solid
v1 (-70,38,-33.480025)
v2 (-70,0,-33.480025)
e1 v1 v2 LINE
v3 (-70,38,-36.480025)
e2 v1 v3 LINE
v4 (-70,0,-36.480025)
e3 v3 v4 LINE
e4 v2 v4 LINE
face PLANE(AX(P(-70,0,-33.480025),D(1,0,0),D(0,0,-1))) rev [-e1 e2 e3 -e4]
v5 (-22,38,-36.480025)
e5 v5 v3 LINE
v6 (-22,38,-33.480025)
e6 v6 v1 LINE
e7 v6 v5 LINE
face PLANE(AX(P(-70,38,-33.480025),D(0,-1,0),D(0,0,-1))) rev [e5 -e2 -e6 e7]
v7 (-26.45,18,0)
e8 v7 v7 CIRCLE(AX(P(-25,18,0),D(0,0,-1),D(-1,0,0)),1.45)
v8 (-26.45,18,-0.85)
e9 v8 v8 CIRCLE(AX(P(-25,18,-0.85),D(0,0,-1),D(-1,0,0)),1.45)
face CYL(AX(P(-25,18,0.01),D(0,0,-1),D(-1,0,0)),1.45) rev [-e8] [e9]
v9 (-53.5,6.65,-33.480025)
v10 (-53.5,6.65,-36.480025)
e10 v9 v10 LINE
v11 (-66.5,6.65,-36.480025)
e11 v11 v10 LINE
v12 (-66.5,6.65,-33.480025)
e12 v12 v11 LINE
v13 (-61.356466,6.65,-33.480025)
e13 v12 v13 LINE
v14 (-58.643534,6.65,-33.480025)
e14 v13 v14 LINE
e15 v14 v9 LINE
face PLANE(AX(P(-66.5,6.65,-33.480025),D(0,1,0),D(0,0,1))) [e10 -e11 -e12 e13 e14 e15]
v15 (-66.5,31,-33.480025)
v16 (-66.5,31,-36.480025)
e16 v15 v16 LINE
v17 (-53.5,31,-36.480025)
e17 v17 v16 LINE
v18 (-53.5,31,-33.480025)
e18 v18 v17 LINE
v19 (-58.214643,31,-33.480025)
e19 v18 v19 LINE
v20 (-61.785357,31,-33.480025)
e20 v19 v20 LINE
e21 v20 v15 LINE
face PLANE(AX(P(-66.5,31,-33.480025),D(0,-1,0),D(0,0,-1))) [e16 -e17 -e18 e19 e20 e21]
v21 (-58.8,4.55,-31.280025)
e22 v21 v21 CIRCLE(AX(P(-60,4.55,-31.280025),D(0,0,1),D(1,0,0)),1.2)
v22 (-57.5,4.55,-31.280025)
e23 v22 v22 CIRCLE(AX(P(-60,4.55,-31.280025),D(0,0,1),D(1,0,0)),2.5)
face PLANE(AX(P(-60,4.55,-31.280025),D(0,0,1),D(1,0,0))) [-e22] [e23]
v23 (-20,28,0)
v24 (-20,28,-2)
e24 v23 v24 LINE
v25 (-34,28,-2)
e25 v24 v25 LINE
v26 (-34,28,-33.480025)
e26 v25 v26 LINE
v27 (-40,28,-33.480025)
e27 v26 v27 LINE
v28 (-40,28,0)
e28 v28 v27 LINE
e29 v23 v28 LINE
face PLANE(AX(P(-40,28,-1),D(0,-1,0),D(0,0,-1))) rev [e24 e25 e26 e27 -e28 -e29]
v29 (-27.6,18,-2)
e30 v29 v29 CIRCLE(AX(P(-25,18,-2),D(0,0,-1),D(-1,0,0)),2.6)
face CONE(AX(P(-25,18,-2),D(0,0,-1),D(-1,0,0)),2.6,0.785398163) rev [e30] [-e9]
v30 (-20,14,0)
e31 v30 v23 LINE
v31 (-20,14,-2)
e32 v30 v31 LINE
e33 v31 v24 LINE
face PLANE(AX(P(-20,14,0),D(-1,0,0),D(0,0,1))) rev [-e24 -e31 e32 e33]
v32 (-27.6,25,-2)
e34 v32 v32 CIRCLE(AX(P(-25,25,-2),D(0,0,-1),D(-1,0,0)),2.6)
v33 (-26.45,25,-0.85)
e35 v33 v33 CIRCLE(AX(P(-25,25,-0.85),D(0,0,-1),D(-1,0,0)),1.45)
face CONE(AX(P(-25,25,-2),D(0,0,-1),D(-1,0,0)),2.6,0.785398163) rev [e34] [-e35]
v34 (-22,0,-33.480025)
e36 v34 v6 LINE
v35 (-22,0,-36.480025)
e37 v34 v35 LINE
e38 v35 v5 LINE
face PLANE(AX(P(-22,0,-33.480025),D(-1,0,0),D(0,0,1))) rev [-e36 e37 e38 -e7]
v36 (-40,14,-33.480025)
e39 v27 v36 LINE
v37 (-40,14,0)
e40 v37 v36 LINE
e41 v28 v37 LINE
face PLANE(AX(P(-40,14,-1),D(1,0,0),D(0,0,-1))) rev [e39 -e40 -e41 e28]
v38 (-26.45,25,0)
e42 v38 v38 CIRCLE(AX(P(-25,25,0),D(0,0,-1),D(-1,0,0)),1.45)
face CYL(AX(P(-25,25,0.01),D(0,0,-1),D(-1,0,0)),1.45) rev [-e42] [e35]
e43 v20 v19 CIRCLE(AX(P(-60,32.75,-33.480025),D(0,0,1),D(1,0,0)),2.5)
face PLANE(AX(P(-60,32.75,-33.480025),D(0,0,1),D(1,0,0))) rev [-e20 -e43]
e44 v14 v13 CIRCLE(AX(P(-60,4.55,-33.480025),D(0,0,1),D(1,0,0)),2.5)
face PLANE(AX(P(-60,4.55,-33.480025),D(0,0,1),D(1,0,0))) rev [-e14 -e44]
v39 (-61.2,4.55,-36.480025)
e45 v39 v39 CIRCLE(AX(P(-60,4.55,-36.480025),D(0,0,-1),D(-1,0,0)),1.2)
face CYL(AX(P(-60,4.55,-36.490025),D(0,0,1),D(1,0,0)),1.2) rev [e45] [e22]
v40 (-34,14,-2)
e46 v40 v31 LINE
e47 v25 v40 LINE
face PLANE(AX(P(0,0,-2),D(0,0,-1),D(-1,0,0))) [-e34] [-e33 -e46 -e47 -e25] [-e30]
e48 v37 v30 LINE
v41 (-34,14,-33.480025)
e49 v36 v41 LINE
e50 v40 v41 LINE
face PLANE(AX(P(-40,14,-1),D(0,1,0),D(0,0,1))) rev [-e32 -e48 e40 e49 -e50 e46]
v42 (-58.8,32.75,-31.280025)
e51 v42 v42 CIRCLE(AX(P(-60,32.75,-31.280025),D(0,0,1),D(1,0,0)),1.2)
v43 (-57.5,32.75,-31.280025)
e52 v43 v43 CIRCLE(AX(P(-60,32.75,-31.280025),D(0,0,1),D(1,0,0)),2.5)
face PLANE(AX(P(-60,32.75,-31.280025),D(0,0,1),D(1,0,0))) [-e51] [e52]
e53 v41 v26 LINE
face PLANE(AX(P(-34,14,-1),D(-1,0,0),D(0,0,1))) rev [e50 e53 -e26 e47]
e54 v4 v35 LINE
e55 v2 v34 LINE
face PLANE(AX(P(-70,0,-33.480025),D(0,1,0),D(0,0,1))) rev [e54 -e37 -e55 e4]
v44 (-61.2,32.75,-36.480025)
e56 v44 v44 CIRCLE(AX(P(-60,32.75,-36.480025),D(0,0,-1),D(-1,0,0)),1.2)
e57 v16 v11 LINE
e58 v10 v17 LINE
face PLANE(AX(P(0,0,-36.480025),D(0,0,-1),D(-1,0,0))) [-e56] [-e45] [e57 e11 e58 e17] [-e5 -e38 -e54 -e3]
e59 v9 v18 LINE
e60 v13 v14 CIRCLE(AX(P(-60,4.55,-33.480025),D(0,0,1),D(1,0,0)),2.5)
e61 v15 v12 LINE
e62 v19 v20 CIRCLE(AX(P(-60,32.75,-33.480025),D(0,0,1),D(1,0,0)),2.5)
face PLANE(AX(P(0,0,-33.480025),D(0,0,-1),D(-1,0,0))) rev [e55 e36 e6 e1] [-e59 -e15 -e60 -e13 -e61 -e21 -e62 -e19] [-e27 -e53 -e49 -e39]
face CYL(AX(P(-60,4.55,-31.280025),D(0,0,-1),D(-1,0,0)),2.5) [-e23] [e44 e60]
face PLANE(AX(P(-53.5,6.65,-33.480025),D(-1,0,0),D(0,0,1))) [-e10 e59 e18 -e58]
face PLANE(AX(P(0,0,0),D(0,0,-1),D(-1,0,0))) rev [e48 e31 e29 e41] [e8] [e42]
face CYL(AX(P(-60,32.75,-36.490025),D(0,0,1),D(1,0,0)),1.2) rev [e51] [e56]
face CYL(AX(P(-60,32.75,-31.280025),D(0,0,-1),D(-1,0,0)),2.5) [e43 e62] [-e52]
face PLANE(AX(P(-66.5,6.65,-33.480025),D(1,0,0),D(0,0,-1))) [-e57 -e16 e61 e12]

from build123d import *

# Parameters (mm, degrees)
SERVO_SHELF_START                        = -36.480025
SKETCH1_W                                = 48
SKETCH1_H                                = 38
SKETCH1_W_2                              = 13
SKETCH1_H_2                              = 24.35
SERVO_SHELF_DEPTH                        = 3
OUTBOARD_RISER_START                     = -34.480025
SKETCH2_W                                = 6
SKETCH2_H                                = 14
OUTBOARD_RISER_DEPTH                     = 33.480025
PLATE_ATTACHMENT_FOOT_START              = -2
SKETCH3_W                                = 20
SKETCH3_H                                = 14
PLATE_ATTACHMENT_FOOT_DEPTH              = 2
SKETCH4_R                                = 1.45
SERVO_PAD_D2P9_DEPTH                     = 2.01
SKETCH5_R                                = 2.6
SERVO_PAD_CSK_D5P2_90DEG_DEPTH           = 1.15
SERVO_PAD_CSK_D5P2_90DEG_DRAFT           = -45
SERVO_PAD_CSK_D5P2_90DEG_PROFILE_2_DEPTH = 1.15
SERVO_PAD_CSK_D5P2_90DEG_PROFILE_2_DRAFT = -45
SERVO_EAR_SUPPORTS_H2P2_START            = -33.480025
SKETCH6_R                                = 2.5
SERVO_EAR_SUPPORTS_H2P2_DEPTH            = 2.2
SKETCH7_R                                = 1.2
SERVO_EAR_D2P4_THROUGH_DEPTH             = 5.21


with BuildPart() as part:
    # Sketch1 → Servo_Shelf (new body)
    with BuildSketch(Plane.XY.offset(SERVO_SHELF_START)):
        with Locations((-46, 19)):
            Rectangle(SKETCH1_W, SKETCH1_H)
        with Locations((-60, 18.825)):
            Rectangle(SKETCH1_W_2, SKETCH1_H_2, mode=Mode.SUBTRACT)
    extrude(amount=SERVO_SHELF_DEPTH)

    # Sketch2 → Outboard_Riser (add)
    with BuildSketch(Plane.XY.offset(OUTBOARD_RISER_START)):
        with Locations((-37, 21)):
            Rectangle(SKETCH2_W, SKETCH2_H)
    extrude(amount=OUTBOARD_RISER_DEPTH)

    # Sketch3 → Plate_Attachment_Foot (add)
    with BuildSketch(Plane.XY.offset(PLATE_ATTACHMENT_FOOT_START)):
        with Locations((-30, 21)):
            Rectangle(SKETCH3_W, SKETCH3_H)
    extrude(amount=PLATE_ATTACHMENT_FOOT_DEPTH)

    # Sketch4 → Servo_Pad_D2p9 (cut)
    with BuildSketch(Plane(origin=(0, 0, -2), x_dir=(-1, 0, 0), z_dir=(0, 0, -1))):
        with Locations((25, 18)):
            Circle(SKETCH4_R)
        with Locations((25, 25)):
            Circle(SKETCH4_R)
    extrude(amount=-SERVO_PAD_D2P9_DEPTH, mode=Mode.SUBTRACT)


with BuildPart() as servo_pad_csk_d5p2_90deg_tool:
    # Sketch5 → Servo_Pad_CSK_D5p2_90deg (with draft: the straight prism first)
    with BuildSketch(Plane(origin=(0, 0, -2), x_dir=(-1, 0, 0), z_dir=(0, 0, -1))):
        with Locations((25, 18)):
            Circle(SKETCH5_R)
    extrude(amount=-SERVO_PAD_CSK_D5P2_90DEG_DEPTH)
    # Servo_Pad_CSK_D5p2_90deg: the draft: its side faces are tilted about the plane it starts from
    servo_pad_csk_d5p2_90deg_sides = [servo_pad_csk_d5p2_90deg_tool.faces().sort_by_distance(p)[0] for p in [
        (-22.4, 18, -1.425),
    ]]
    draft(servo_pad_csk_d5p2_90deg_sides, Plane(origin=(0, 0, -2), x_dir=(-1, 0, 0), z_dir=(0, 0, -1)), SERVO_PAD_CSK_D5P2_90DEG_DRAFT)


with BuildPart() as part_1:
    add(part.part)

    # Servo_Pad_CSK_D5p2_90deg: cut by servo_pad_csk_d5p2_90deg_tool
    add(servo_pad_csk_d5p2_90deg_tool.part, mode=Mode.SUBTRACT)


with BuildPart() as servo_pad_csk_d5p2_90deg_profile_2_tool:
    # Sketch5 → Servo_Pad_CSK_D5p2_90deg profile 2 (with draft: the straight prism first)
    with BuildSketch(Plane(origin=(0, 0, -2), x_dir=(-1, 0, 0), z_dir=(0, 0, -1))):
        with Locations((25, 25)):
            Circle(SKETCH5_R)
    extrude(amount=-SERVO_PAD_CSK_D5P2_90DEG_PROFILE_2_DEPTH)
    # Servo_Pad_CSK_D5p2_90deg profile 2: the draft: its side faces are tilted about the plane it starts from
    servo_pad_csk_d5p2_90deg_profile_2_sides = [servo_pad_csk_d5p2_90deg_profile_2_tool.faces().sort_by_distance(p)[0] for p in [
        (-22.4, 25, -1.425),
    ]]
    draft(servo_pad_csk_d5p2_90deg_profile_2_sides, Plane(origin=(0, 0, -2), x_dir=(-1, 0, 0), z_dir=(0, 0, -1)), SERVO_PAD_CSK_D5P2_90DEG_PROFILE_2_DRAFT)


with BuildPart() as part_2:
    add(part_1.part)

    # Servo_Pad_CSK_D5p2_90deg profile 2: cut by servo_pad_csk_d5p2_90deg_profile_2_tool
    add(servo_pad_csk_d5p2_90deg_profile_2_tool.part, mode=Mode.SUBTRACT)

    # Sketch6 → Servo_Ear_Supports_H2p2 (add)
    with BuildSketch(Plane.XY.offset(SERVO_EAR_SUPPORTS_H2P2_START)):
        with Locations((-60, 4.55)):
            Circle(SKETCH6_R)
        with Locations((-60, 32.75)):
            Circle(SKETCH6_R)
    extrude(amount=SERVO_EAR_SUPPORTS_H2P2_DEPTH)

    # Sketch7 → Servo_Ear_D2p4_Through (cut)
    with BuildSketch(Plane.XY.offset(-31.280025)):
        with Locations((-60, 4.55)):
            Circle(SKETCH7_R)
        with Locations((-60, 32.75)):
            Circle(SKETCH7_R)
    extrude(amount=-SERVO_EAR_D2P4_THROUGH_DEPTH, mode=Mode.SUBTRACT)


solid = part_2.part
